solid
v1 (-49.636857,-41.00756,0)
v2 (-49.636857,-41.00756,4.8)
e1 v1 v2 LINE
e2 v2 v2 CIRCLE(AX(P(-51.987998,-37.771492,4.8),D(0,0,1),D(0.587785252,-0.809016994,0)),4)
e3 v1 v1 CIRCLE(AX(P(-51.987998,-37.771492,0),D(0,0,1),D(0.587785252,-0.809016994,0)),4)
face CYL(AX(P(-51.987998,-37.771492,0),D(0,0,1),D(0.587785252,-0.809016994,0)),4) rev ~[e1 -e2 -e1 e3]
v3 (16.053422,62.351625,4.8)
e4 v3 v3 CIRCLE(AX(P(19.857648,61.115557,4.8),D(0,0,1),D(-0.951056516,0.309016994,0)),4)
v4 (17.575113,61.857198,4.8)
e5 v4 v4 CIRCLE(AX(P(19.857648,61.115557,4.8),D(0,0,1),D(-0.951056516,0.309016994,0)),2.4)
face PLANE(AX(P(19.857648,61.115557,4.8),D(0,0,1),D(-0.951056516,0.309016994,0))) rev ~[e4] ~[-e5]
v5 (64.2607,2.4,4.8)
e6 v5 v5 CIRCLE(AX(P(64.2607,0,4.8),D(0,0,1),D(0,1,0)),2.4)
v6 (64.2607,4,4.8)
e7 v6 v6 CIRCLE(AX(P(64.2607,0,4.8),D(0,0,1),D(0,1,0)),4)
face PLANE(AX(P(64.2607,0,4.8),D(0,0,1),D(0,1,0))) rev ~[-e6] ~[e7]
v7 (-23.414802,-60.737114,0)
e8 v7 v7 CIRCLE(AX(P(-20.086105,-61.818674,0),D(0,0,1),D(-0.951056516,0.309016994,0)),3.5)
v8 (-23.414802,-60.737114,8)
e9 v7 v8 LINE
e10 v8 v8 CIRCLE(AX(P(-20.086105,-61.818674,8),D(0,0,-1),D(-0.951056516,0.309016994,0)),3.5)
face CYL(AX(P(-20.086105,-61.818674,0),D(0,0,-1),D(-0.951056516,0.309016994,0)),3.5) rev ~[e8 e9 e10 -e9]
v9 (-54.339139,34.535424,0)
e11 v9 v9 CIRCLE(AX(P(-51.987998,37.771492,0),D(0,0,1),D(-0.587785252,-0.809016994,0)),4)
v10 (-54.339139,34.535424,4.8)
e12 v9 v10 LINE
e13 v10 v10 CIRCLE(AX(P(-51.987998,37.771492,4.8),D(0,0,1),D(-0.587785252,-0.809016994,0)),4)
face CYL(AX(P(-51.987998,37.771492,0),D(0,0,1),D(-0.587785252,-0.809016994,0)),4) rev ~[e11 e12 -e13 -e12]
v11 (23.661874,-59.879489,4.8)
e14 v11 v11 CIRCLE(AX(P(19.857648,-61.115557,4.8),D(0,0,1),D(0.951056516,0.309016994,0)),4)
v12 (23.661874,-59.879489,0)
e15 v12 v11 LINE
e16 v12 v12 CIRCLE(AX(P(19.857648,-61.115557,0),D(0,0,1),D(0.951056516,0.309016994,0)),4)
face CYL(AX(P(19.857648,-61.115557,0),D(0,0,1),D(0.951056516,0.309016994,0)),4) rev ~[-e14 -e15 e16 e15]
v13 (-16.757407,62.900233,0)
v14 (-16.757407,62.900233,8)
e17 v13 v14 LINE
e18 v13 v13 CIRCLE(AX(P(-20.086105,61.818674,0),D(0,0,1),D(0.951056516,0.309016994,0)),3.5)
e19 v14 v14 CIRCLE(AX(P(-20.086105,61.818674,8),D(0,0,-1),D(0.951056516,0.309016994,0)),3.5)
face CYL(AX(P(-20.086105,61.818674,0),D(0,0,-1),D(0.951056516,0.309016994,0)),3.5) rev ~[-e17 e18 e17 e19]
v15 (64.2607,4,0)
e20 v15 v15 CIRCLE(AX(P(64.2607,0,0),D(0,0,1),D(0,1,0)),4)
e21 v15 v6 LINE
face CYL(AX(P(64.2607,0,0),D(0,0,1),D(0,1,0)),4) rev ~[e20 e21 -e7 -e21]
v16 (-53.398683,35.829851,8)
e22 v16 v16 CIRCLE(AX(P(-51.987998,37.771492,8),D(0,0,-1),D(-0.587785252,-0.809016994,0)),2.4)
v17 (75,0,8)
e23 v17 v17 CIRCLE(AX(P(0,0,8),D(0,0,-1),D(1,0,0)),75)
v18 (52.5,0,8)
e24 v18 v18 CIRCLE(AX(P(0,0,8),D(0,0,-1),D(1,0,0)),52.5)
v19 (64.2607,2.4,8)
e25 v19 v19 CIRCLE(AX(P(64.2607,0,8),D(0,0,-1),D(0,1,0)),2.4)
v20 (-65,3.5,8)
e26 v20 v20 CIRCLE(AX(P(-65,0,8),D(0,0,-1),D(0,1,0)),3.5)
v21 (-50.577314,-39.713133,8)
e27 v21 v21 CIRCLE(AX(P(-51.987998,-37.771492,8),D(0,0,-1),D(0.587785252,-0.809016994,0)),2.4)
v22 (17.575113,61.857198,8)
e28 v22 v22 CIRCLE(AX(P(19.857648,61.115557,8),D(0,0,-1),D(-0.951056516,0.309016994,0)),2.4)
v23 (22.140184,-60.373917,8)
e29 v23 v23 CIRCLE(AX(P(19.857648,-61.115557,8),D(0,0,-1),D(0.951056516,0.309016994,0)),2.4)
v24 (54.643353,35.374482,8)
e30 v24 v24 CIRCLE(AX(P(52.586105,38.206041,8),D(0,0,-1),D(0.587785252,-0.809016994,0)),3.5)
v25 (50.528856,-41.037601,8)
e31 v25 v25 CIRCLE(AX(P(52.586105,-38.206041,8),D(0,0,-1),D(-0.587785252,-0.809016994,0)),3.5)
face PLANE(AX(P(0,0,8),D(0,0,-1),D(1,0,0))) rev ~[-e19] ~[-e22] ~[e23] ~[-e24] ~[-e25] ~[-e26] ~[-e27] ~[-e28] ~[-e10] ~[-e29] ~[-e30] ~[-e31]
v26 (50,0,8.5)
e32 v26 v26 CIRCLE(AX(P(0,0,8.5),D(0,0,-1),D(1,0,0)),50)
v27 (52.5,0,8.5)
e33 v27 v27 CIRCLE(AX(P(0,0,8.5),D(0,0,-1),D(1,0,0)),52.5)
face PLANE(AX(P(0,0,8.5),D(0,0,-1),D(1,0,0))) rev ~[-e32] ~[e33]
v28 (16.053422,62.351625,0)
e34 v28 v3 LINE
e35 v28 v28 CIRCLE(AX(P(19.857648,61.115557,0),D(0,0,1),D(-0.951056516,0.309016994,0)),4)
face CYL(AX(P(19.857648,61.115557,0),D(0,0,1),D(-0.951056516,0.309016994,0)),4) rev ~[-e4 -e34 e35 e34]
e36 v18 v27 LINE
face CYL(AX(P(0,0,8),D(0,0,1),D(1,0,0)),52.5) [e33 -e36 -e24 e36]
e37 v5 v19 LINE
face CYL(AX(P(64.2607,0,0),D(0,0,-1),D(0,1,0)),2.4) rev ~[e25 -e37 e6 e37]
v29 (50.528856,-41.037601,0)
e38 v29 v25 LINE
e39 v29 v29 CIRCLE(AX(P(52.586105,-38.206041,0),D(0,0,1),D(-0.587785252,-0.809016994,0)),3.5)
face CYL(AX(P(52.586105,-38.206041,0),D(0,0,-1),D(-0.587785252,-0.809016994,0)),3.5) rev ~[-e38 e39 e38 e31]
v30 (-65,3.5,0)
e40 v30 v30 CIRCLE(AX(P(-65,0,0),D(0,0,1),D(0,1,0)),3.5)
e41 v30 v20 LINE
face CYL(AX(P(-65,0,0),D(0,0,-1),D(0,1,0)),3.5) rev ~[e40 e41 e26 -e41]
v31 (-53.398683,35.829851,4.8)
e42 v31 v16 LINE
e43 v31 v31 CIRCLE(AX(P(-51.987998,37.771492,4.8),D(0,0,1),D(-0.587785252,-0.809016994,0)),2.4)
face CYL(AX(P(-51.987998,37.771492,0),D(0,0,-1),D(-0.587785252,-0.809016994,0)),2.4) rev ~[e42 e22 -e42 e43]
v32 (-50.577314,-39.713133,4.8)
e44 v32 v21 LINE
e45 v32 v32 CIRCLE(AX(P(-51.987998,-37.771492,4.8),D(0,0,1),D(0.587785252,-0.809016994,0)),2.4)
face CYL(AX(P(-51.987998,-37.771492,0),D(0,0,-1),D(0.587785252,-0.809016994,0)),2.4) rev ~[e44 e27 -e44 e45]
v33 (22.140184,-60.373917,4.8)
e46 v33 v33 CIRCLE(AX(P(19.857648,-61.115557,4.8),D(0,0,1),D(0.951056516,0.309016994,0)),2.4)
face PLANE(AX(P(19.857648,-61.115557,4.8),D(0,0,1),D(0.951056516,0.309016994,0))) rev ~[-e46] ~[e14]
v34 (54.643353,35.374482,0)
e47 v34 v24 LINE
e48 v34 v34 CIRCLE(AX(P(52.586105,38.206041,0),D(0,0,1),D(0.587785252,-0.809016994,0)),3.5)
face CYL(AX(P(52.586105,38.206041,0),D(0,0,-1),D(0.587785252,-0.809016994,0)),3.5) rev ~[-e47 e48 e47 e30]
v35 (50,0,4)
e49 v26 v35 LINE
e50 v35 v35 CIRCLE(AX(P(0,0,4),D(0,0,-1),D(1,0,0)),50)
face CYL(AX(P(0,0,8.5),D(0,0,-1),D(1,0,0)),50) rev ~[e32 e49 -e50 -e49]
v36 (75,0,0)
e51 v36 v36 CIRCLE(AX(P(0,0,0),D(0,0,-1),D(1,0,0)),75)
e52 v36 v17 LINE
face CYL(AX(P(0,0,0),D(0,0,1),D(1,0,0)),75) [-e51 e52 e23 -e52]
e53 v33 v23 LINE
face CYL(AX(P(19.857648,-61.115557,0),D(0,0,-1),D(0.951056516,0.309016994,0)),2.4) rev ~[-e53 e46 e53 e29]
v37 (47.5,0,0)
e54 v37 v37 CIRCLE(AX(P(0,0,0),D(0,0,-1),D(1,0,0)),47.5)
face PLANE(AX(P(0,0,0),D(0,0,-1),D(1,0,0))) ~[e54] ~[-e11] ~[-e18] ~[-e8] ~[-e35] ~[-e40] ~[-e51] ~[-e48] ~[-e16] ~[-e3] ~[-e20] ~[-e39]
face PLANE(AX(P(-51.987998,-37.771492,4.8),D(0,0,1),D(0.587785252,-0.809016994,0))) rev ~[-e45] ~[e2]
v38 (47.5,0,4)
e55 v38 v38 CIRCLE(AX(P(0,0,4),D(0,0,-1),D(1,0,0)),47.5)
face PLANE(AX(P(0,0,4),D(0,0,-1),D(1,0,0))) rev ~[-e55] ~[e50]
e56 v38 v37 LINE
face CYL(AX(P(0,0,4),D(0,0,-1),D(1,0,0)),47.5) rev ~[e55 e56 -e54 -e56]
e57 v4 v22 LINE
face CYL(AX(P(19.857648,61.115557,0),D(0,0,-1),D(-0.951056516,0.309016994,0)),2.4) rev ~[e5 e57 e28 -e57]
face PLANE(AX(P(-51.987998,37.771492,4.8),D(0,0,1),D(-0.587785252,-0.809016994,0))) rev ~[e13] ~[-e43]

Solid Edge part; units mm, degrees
sketch "Sketch1" plane through (0, 0, 0) normal (0, -1, 0) x (1, 0, 0)
  line L0 (47.5, 4) -> (47.5, 0)
  line L1 (47.5, 0) -> (75, 0)
  line L2 (75, 0) -> (75, 8)
  line L3 (75, 8) -> (52.5, 8)
  line L4 (52.5, 8) -> (52.5, 8.5)
  line L5 (52.5, 8.5) -> (50, 8.5)
  line L6 (50, 8.5) -> (50, 4)
  line L7 (50, 4) -> (47.5, 4)
  dimension "D1" = 4
  dimension "D2" = 8.5
  dimension "D3" = 8
revolve "RevolvedProtrusion1" add sketch "Sketch1" angle 360 about axis through (0, 0, 54) along (0, 0, -1)
hole "Hole_1" at (64.2607, 0, 0) direction (0, 0, 1) diameter 4.8 end up to next counterbore diameter 8 counterbore depth 4.8
pattern_circular "Pattern1" count 5 over 360 about axis through (0, 0, 8) along (0, 0, 1) of "Hole_1"
hole "Hole_2" at (-65, 0, 0) direction (0, 0, 1) diameter 7 end up to next
pattern_circular "Pattern2" count 5 over 360 about axis through (0, 0, 0) along (0, 0, 1) of "Hole_2"
properties material "Polyethylene, low density"
